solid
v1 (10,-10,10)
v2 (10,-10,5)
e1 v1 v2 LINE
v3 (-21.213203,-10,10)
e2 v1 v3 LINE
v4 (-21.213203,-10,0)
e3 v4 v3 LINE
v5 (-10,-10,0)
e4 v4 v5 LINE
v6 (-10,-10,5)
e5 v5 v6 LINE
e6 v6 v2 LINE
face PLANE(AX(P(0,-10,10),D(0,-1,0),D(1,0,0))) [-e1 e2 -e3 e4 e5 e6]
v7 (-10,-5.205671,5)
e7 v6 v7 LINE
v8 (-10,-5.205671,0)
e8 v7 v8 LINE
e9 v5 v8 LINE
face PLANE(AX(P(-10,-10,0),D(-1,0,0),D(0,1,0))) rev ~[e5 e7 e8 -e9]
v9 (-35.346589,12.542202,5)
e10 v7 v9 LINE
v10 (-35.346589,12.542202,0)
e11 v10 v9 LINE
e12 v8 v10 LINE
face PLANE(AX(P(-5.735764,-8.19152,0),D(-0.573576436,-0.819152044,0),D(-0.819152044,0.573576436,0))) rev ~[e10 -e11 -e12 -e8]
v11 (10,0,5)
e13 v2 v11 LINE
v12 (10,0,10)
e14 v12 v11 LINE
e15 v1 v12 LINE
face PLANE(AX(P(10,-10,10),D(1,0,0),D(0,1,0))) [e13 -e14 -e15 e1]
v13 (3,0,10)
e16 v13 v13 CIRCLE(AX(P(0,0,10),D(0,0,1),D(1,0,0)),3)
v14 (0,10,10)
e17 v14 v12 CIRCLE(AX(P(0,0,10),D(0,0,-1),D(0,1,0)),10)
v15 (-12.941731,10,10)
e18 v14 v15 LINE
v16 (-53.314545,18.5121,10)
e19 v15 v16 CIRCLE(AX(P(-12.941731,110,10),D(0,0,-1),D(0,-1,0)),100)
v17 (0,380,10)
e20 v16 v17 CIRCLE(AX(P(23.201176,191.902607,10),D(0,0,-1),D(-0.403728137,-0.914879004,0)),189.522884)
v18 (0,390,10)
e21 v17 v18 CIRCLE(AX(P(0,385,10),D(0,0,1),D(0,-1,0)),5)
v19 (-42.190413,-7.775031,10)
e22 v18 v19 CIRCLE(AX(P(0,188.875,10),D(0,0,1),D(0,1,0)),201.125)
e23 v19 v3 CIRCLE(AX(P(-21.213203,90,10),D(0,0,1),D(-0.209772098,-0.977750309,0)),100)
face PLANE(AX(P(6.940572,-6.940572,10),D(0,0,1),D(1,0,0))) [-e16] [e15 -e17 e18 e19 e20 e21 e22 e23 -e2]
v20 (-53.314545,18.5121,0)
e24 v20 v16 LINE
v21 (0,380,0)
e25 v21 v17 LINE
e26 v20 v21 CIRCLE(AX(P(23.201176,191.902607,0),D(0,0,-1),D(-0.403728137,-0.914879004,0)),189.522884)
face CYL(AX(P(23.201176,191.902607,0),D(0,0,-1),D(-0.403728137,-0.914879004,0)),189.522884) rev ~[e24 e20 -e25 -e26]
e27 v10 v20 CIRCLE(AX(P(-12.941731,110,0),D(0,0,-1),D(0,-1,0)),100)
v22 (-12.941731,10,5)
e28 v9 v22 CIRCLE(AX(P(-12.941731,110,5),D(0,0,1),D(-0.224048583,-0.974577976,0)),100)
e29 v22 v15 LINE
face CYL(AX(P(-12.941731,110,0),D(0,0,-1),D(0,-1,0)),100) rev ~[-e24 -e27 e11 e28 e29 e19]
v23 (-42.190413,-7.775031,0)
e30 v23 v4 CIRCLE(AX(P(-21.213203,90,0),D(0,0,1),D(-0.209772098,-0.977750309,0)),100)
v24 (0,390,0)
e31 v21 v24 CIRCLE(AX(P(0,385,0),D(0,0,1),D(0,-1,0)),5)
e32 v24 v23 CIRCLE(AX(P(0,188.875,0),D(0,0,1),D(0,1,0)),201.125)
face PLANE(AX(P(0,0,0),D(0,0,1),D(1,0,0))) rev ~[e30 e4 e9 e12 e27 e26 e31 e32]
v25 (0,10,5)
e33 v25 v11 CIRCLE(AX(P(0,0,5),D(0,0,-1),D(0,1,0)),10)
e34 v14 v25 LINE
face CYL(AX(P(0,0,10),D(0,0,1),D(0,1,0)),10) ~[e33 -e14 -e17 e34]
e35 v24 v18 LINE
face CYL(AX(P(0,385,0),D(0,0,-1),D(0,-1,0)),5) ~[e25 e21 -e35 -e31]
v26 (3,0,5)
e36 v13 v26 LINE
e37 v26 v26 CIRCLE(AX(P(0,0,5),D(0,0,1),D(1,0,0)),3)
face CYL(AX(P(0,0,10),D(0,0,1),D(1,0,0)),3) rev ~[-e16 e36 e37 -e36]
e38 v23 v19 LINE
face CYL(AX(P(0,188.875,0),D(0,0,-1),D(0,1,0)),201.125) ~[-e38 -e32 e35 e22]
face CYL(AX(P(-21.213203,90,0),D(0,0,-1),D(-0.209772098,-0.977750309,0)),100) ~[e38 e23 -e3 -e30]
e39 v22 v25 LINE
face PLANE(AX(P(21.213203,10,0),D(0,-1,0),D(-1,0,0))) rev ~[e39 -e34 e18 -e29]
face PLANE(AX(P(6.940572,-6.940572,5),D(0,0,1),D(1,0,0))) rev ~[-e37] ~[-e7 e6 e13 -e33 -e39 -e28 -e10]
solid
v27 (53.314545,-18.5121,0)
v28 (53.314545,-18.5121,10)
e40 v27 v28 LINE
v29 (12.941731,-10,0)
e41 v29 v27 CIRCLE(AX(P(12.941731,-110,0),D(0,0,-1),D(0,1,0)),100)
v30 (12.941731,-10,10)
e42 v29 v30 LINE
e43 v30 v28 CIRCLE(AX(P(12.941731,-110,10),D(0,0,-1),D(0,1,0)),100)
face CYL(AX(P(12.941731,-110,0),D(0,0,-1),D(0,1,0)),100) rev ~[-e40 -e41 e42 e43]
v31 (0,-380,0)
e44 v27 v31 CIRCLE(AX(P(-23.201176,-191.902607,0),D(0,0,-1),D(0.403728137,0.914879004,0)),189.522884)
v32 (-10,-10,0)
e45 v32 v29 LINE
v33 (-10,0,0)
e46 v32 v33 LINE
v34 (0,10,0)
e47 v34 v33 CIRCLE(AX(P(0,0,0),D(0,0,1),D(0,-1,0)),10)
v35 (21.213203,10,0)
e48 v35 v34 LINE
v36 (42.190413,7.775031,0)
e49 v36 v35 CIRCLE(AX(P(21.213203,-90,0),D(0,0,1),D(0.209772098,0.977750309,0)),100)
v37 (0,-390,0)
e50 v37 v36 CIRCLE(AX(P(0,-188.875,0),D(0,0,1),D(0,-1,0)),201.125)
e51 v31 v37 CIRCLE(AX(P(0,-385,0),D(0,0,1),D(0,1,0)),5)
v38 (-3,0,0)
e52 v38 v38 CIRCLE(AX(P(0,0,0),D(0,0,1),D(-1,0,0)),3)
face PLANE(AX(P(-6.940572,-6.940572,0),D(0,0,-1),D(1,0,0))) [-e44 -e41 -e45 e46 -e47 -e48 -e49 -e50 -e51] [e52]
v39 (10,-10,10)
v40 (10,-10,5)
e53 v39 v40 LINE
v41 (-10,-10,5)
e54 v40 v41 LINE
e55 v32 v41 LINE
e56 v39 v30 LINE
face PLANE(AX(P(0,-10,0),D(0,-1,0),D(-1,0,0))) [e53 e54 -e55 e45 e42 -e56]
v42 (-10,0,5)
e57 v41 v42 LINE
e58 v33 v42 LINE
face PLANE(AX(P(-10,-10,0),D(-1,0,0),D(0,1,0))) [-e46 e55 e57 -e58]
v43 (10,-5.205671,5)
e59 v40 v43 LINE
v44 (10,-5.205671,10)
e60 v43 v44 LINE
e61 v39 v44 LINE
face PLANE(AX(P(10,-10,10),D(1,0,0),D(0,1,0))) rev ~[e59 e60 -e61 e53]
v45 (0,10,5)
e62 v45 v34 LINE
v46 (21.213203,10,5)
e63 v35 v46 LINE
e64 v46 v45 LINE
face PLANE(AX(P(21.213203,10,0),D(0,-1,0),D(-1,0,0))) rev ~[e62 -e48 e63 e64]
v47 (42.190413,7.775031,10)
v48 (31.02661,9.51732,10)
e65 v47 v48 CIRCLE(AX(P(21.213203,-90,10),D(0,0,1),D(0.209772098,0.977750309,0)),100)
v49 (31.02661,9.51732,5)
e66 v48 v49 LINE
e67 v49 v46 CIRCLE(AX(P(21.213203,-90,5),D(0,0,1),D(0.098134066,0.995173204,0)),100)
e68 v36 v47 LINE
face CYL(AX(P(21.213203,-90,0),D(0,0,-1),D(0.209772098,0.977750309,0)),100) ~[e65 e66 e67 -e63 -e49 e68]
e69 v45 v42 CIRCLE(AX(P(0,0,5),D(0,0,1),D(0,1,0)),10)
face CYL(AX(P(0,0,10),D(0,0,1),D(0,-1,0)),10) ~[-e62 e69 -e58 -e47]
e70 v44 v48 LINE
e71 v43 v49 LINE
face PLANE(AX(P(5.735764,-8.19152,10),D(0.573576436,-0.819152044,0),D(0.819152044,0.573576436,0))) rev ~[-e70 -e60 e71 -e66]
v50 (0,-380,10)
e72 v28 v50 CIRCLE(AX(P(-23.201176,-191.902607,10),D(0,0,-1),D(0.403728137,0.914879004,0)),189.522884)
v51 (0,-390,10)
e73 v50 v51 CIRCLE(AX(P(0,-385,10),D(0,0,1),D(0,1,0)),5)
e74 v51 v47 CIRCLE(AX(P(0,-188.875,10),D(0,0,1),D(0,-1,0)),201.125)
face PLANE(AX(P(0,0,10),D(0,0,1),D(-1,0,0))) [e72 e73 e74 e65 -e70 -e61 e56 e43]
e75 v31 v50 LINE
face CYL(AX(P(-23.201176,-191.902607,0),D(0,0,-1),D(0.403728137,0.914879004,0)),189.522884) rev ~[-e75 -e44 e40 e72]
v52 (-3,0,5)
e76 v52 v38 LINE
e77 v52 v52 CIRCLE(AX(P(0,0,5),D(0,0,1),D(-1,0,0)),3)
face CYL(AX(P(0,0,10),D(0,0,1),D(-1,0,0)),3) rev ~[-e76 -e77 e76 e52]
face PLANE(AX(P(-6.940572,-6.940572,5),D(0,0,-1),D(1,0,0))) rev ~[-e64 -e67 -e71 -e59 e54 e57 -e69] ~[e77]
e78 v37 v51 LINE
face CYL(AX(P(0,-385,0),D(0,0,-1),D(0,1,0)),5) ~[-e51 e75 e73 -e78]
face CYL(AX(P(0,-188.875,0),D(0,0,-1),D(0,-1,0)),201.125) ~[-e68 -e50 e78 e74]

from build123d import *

# Parameters (mm, degrees)
F1_DEPTH  = 10
F2_R      = 3
F3_DEPTH  = 25
F6_DEPTH  = 5
F10_DEPTH = 5
F12_DEPTH = 5
F13_DEPTH = 5
F15_DEPTH = 5
F16_DEPTH = 5


with BuildPart() as f1:
    # F0 (on Top) → F1 (new body)
    with BuildSketch(Plane.XY):
        with BuildLine():
            ThreePointArc((0, 380), (5, 385), (0, 390))
            ThreePointArc((0, 390), (-200.0031288383, 210.088535299), (-42.1904132607, -7.7750309023))
            ThreePointArc((-42.1904132607, -7.7750309023), (-31.7606417446, -9.4422020327), (-21.2132034356, -10))
            Line((-21.2132034356, -10), (0, -10))
            Line((0, -10), (12.9417308956, -10))
            ThreePointArc((12.9417308956, -10), (33.5719267784, -12.1511624094), (53.3145446236, -18.5120996432))
            ThreePointArc((53.3145446236, -18.5120996432), (164.29346462, -219.555514643), (0, -380))
            ThreePointArc((0, -380), (-5, -385), (0, -390))
            ThreePointArc((0, -390), (200.0031288383, -210.088535299), (42.1904132607, 7.7750309023))
            ThreePointArc((42.1904132607, 7.7750309023), (31.7606417446, 9.4422020327), (21.2132034356, 10))
            Line((21.2132034356, 10), (0, 10))
            Line((0, 10), (-12.9417308956, 10))
            ThreePointArc((-12.9417308956, 10), (-33.5719267784, 12.1511624094), (-53.3145446236, 18.5120996432))
            ThreePointArc((-53.3145446236, 18.5120996432), (-164.29346462, 219.555514643), (0, 380))
        make_face()
    extrude(amount=F1_DEPTH)

    # F2 (on face) → F3 (cut)
    with BuildSketch(Plane.XY.offset(10)):
        Circle(F2_R)
        with BuildLine():
            ThreePointArc((0, 10), (10, 0), (0, -10))
            Line((0, -10), (12.9417308956, -10))
            ThreePointArc((12.9417308956, -10), (33.5719267784, -12.1511624094), (53.3145446236, -18.5120996432))
            ThreePointArc((53.3145446236, -18.5120996432), (164.29346462, -219.555514643), (0, -380))
            ThreePointArc((0, -380), (-5, -385), (0, -390))
            ThreePointArc((0, -390), (200.0031288383, -210.088535299), (42.1904132607, 7.7750309023))
            ThreePointArc((42.1904132607, 7.7750309023), (31.7606417446, 9.4422020327), (21.2132034356, 10))
            Line((21.2132034356, 10), (0, 10))
        make_face()
    extrude(amount=-F3_DEPTH, mode=Mode.SUBTRACT)


with BuildPart() as f4_1:
    # F4: instance of F1
    add(f1.part.mirror(Plane.YZ))


with BuildPart() as f1_1:
    add(f1.part)

    # F5 (on face) → F6 (cut)
    with BuildSketch(Plane(origin=(0, 0, 0), x_dir=(1, 0, 0), z_dir=(0, 0, -1))):
        with BuildLine():
            ThreePointArc((0, -10), (7.0710678119, -7.0710678119), (10, 0))
            ThreePointArc((10, 0), (4.6174861324, 8.8701083318), (-5.7357643635, 8.1915204429))
            ThreePointArc((-5.7357643635, 8.1915204429), (-9.5371695075, -3.007057995), (0, -10))
        make_face()
        with BuildLine():
            ThreePointArc((0, -10), (-9.5371695075, -3.007057995), (-5.7357643635, 8.1915204429))
            Line((-5.7357643635, 8.1915204429), (-35.3465892462, -12.5422023525))
            ThreePointArc((-35.3465892462, -12.5422023525), (-24.2160431863, -10.6375831495), (-12.9417308956, -10))
            Line((-12.9417308956, -10), (0, -10))
        make_face()
    extrude(amount=-F6_DEPTH, mode=Mode.SUBTRACT)

    # F11 (on face) → F13 (cut)
    with BuildSketch(Plane(origin=(0, 0, 0), x_dir=(1, 0, 0), z_dir=(0, 0, -1))):
        with BuildLine():
            ThreePointArc((-10, 0), (-7.0710678119, 7.0710678119), (0, 10))
            Line((0, 10), (-10, 10))
            Line((-10, 10), (-10, 0))
        make_face()
    extrude(amount=-F13_DEPTH, mode=Mode.SUBTRACT)

    # F14 (on face) → F15 (join)
    with BuildSketch(Plane.XY.offset(10)):
        with BuildLine():
            ThreePointArc((10, 0), (7.0710678119, -7.0710678119), (0, -10))
            Line((0, -10), (10, -10))
            Line((10, -10), (10, 0))
        make_face()
    extrude(amount=-F15_DEPTH)


with BuildPart() as f7_1:
    # F7: instance of F4_1
    add(f4_1.part.mirror(Plane.XZ))

    # F9 (on face) → F10 (cut)
    with BuildSketch(Plane.XY.offset(10)):
        with BuildLine():
            ThreePointArc((5.7357643635, -8.1915204429), (8.8701083318, -4.6174861324), (10, 0))
            ThreePointArc((10, 0), (7.0710678119, 7.0710678119), (0, 10))
            ThreePointArc((0, 10), (-9.5371695075, -3.007057995), (5.7357643635, -8.1915204429))
        make_face()
        with BuildLine():
            ThreePointArc((0, 10), (7.0710678119, 7.0710678119), (10, 0))
            ThreePointArc((10, 0), (8.8701083318, -4.6174861324), (5.7357643635, -8.1915204429))
            Line((5.7357643635, -8.1915204429), (31.0266100505, 9.5173203549))
            ThreePointArc((31.0266100505, 9.5173203549), (26.1258383963, 9.8792571946), (21.2132034356, 10))
            Line((21.2132034356, 10), (0, 10))
        make_face()
    extrude(amount=-F10_DEPTH, mode=Mode.SUBTRACT)

    # F11 (on face) → F12 (join)
    with BuildSketch(Plane(origin=(0, 0, 0), x_dir=(1, 0, 0), z_dir=(0, 0, -1))):
        with BuildLine():
            ThreePointArc((-10, 0), (-7.0710678119, 7.0710678119), (0, 10))
            Line((0, 10), (-10, 10))
            Line((-10, 10), (-10, 0))
        make_face()
    extrude(amount=-F12_DEPTH)

    # F14 (on face) → F16 (cut)
    with BuildSketch(Plane.XY.offset(10)):
        with BuildLine():
            ThreePointArc((10, 0), (7.0710678119, -7.0710678119), (0, -10))
            Line((0, -10), (10, -10))
            Line((10, -10), (10, 0))
        make_face()
    extrude(amount=-F16_DEPTH, mode=Mode.SUBTRACT)


solid = Compound([f1_1.part, f7_1.part])
